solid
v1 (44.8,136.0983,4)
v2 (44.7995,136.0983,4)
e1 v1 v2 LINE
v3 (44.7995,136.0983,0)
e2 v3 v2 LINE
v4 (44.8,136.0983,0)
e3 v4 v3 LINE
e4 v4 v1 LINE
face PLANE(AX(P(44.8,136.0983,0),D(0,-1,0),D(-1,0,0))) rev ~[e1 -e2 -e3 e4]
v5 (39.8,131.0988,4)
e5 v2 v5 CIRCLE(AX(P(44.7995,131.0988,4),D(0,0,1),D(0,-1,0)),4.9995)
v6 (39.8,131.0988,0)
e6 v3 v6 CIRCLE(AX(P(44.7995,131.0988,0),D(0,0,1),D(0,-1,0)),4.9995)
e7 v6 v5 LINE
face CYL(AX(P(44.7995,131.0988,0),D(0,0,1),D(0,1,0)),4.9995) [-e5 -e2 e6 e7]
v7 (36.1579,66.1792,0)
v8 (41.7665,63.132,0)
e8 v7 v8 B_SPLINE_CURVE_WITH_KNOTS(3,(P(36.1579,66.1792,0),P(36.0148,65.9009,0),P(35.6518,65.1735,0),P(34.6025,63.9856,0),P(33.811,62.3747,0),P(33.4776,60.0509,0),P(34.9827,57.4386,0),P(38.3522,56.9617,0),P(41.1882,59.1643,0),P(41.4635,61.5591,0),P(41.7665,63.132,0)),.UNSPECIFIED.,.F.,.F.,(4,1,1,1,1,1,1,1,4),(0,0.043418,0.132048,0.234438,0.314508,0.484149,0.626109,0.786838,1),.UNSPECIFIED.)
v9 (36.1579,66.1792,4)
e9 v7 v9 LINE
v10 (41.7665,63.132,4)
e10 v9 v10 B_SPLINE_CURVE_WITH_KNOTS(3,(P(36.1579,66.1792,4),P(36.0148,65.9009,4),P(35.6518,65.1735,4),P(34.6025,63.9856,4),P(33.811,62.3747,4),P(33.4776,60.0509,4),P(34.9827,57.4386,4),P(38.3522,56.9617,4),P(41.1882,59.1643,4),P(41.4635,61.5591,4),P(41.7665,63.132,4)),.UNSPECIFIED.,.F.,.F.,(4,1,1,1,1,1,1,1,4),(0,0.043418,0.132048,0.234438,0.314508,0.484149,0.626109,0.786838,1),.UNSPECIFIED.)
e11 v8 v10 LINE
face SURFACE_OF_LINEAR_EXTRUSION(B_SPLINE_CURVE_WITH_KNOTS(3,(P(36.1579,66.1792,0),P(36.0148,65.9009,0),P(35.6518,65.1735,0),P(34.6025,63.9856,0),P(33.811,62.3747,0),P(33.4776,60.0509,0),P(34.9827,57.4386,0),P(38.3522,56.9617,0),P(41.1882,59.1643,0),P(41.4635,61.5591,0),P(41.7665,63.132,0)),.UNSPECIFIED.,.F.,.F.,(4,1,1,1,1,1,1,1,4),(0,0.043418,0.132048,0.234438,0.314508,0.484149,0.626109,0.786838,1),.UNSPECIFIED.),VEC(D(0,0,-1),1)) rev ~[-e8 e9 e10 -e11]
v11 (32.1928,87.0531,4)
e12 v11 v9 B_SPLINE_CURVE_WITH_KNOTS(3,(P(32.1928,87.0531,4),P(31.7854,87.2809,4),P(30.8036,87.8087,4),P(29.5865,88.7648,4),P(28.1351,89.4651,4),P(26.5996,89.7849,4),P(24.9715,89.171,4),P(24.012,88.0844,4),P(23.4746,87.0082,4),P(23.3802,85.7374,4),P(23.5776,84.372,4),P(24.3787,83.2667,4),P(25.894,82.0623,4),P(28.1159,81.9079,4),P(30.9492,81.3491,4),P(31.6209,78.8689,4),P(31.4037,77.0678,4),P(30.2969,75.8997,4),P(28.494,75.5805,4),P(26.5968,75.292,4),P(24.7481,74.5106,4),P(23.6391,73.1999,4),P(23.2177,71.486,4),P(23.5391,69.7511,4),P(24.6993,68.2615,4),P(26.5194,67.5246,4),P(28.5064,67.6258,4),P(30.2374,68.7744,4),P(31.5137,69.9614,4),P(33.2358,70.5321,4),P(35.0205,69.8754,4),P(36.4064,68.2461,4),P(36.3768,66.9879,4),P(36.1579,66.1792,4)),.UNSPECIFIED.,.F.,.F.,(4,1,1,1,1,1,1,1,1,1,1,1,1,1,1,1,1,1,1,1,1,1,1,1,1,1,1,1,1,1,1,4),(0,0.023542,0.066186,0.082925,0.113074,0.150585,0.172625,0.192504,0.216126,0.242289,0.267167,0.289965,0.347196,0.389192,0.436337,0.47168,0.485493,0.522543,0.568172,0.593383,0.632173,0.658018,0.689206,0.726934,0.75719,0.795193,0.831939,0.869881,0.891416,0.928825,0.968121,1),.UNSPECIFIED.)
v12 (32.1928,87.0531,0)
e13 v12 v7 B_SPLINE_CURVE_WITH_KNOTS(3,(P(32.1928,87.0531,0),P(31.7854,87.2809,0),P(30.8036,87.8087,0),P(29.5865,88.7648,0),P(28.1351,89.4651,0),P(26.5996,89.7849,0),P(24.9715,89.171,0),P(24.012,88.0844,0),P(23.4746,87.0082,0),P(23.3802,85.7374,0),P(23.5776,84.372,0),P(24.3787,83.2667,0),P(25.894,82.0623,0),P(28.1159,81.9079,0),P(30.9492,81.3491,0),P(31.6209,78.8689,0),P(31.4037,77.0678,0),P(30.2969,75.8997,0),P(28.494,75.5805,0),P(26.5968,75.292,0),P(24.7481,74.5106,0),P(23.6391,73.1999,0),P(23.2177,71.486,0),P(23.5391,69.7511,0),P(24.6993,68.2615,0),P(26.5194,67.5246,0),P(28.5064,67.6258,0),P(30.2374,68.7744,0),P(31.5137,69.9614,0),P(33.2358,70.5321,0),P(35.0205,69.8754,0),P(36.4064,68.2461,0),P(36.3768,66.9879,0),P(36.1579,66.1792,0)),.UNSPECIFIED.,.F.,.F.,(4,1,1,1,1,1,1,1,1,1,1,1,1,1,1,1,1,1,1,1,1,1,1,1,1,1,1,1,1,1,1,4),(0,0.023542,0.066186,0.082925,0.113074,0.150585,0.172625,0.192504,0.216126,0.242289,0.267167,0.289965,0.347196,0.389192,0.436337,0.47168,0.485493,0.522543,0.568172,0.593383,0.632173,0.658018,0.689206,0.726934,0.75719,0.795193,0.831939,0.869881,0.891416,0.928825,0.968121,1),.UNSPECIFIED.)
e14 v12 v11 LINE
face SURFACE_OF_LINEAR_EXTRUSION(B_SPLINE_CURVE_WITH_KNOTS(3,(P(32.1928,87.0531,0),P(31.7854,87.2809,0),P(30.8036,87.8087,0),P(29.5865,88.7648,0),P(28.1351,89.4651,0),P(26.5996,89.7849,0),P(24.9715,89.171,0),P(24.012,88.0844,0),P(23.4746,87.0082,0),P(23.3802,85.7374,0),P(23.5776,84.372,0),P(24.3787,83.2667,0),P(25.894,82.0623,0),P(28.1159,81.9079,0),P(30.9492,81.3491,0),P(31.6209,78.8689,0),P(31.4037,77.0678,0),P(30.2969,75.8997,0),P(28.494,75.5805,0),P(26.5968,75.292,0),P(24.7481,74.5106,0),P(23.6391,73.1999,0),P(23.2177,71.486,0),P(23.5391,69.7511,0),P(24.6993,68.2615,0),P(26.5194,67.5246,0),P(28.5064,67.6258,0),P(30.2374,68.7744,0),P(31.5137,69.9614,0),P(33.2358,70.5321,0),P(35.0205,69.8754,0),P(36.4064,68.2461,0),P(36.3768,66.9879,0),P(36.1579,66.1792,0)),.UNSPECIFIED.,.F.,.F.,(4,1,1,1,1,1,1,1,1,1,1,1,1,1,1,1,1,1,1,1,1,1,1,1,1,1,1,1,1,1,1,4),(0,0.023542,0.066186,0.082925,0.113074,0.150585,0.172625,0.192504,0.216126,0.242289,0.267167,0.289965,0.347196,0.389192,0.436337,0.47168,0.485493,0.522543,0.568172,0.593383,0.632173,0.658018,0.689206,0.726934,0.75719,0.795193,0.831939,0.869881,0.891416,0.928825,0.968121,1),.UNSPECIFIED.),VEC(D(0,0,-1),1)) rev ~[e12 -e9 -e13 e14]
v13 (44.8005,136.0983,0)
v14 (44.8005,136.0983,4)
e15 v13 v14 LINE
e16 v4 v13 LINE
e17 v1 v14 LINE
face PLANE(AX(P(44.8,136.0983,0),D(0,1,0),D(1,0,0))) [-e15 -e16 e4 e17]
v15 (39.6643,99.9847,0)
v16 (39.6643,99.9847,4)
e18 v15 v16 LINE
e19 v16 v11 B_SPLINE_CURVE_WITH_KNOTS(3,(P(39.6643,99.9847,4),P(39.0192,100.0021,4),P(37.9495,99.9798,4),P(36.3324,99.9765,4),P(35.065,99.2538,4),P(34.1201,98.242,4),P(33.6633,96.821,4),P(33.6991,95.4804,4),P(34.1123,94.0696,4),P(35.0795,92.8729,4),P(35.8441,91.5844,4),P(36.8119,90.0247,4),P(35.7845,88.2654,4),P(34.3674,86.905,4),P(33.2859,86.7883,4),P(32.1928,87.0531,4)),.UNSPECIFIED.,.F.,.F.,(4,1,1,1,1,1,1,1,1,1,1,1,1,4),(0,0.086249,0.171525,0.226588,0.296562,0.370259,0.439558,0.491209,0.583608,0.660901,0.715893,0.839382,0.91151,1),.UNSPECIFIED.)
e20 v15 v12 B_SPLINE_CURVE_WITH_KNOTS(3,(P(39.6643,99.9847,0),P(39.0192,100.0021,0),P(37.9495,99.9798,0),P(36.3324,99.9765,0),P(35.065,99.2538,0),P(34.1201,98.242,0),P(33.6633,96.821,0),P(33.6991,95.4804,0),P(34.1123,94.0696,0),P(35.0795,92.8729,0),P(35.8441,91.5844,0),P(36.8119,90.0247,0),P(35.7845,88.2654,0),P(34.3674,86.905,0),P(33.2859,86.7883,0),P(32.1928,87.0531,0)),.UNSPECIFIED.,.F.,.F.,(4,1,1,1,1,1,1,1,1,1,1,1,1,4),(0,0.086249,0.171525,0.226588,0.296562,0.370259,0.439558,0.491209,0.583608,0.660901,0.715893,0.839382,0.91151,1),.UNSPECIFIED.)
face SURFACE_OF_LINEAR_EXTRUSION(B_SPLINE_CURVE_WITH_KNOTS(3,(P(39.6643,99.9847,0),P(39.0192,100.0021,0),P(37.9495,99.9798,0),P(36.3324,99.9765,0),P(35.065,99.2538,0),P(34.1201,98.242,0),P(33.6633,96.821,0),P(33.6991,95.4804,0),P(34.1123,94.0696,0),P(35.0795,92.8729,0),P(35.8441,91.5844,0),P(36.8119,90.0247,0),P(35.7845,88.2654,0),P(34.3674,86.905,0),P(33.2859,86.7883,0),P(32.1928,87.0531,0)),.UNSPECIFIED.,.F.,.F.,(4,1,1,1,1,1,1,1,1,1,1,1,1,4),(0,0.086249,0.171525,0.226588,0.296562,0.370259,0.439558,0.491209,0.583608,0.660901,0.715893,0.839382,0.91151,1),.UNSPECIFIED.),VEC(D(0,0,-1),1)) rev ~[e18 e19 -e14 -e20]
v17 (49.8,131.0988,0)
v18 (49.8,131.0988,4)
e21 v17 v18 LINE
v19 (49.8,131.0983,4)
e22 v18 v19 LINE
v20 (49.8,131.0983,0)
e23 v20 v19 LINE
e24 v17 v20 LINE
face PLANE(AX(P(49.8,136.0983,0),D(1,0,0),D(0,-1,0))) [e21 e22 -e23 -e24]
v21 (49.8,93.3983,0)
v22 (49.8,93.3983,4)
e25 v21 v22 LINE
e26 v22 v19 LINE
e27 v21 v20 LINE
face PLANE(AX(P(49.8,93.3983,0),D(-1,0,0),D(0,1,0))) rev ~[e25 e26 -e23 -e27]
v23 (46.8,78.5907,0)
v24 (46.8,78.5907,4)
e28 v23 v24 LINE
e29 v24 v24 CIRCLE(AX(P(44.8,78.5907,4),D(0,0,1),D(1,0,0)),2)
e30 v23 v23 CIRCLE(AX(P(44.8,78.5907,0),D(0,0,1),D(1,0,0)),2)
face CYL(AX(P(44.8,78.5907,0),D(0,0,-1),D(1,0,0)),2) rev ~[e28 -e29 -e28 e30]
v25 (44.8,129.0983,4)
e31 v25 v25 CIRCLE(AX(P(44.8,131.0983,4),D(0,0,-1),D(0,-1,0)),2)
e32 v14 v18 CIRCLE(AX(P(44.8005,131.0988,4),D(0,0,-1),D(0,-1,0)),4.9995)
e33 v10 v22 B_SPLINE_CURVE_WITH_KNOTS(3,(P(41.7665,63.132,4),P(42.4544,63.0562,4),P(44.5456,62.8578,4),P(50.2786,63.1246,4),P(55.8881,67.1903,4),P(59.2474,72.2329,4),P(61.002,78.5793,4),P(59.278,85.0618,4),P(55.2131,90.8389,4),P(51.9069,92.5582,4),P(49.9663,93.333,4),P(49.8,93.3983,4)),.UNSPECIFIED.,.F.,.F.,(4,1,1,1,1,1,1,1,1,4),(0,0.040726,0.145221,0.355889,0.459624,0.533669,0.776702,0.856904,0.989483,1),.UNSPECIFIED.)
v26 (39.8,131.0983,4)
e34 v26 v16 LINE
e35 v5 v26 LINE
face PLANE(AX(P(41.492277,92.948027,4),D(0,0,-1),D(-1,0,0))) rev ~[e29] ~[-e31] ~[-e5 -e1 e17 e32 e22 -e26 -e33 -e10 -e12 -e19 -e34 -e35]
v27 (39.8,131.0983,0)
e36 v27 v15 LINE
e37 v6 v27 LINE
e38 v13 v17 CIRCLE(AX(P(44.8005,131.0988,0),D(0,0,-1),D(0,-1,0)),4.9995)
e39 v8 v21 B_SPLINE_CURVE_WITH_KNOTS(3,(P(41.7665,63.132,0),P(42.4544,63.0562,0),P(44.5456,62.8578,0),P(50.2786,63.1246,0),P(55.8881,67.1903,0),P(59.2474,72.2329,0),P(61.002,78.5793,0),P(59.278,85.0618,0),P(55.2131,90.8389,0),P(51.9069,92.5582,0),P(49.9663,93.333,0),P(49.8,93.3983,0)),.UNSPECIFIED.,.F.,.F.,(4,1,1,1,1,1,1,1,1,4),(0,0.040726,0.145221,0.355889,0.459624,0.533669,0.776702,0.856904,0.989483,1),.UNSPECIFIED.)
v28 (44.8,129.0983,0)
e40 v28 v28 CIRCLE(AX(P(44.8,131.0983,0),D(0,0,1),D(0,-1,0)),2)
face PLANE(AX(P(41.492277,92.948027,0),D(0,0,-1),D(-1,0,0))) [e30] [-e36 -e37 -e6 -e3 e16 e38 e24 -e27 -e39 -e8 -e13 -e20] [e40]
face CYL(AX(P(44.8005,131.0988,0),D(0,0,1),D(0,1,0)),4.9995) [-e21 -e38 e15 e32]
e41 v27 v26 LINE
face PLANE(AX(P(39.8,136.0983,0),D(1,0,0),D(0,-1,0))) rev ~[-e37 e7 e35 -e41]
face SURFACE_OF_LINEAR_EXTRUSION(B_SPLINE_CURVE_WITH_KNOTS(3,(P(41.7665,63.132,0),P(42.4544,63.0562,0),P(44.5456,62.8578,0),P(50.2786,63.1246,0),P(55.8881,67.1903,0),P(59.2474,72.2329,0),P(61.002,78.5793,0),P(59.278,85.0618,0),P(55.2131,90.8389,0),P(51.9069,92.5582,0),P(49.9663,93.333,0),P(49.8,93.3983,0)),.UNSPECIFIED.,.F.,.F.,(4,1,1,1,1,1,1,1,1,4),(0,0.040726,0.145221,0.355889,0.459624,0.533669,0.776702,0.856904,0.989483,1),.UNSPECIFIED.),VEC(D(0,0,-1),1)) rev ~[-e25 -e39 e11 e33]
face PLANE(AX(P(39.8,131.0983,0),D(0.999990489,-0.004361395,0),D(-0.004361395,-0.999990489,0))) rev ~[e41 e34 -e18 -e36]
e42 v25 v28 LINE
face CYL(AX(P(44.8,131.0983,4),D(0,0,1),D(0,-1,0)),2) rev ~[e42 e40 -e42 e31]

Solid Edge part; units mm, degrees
sketch "Sketch1" plane through (0, 0, 0) normal (0, 0, 1) x (1, 0, 0)
  line L0 (44.8, 136.0983) -> (49.8, 136.0983)
  line L1 (49.8, 136.0983) -> (49.8, 131.0983)
  line L2 (49.8, 93.3983) -> (49.8, 131.0983)
  spline S0 degree 3 poles (41.7665, 63.132) (42.4544, 63.0562) (44.5456, 62.8578) (50.2786, 63.1246) (55.8881, 67.1903) (59.2474, 72.2329) (61.002, 78.5793) (59.278, 85.0618) (55.2131, 90.8389) (51.9069, 92.5582) (49.9663, 93.333) (49.8, 93.3983) knots 0 0 0 0 0.040726 0.145221 0.355889 0.459624 0.533669 0.776702 0.856904 0.989483 1 1 1 1
  spline S1 degree 3 poles (36.1579, 66.1792) (36.0148, 65.9009) (35.6518, 65.1735) (34.6025, 63.9856) (33.811, 62.3747) (33.4776, 60.0509) (34.9827, 57.4386) (38.3522, 56.9617) (41.1882, 59.1643) (41.4635, 61.5591) (41.7665, 63.132) knots 0 0 0 0 0.043418 0.132048 0.234438 0.314508 0.484149 0.626109 0.786838 1 1 1 1
  spline S2 degree 3 poles (32.1928, 87.0531) (31.7854, 87.2809) (30.8036, 87.8087) (29.5865, 88.7648) (28.1351, 89.4651) (26.5996, 89.7849) (24.9715, 89.171) (24.012, 88.0844) (23.4746, 87.0082) (23.3802, 85.7374) (23.5776, 84.372) (24.3787, 83.2667) (25.894, 82.0623) (28.1159, 81.9079) (30.9492, 81.3491) (31.6209, 78.8689) (31.4037, 77.0678) (30.2969, 75.8997) (28.494, 75.5805) (26.5968, 75.292) (24.7481, 74.5106) (23.6391, 73.1999) (23.2177, 71.486) (23.5391, 69.7511) (24.6993, 68.2615) (26.5194, 67.5246) (28.5064, 67.6258) (30.2374, 68.7744) (31.5137, 69.9614) (33.2358, 70.5321) (35.0205, 69.8754) (36.4064, 68.2461) (36.3768, 66.9879) (36.1579, 66.1792) knots 0 0 0 0 0.023542 0.066186 0.082925 0.113074 0.150585 0.172625 0.192504 0.216126 0.242289 0.267167 0.289965 0.347196 0.389192 0.436337 0.47168 0.485493 0.522543 0.568172 0.593383 0.632173 0.658018 0.689206 0.726934 0.75719 0.795193 0.831939 0.869881 0.891416 0.928825 0.968121 1 1 1 1
  spline S3 degree 3 poles (39.6643, 99.9847) (39.0192, 100.0021) (37.9495, 99.9798) (36.3324, 99.9765) (35.065, 99.2538) (34.1201, 98.242) (33.6633, 96.821) (33.6991, 95.4804) (34.1123, 94.0696) (35.0795, 92.8729) (35.8441, 91.5844) (36.8119, 90.0247) (35.7845, 88.2654) (34.3674, 86.905) (33.2859, 86.7883) (32.1928, 87.0531) knots 0 0 0 0 0.086249 0.171525 0.226588 0.296562 0.370259 0.439558 0.491209 0.583608 0.660901 0.715893 0.839382 0.91151 1 1 1 1
  line L3 (39.8, 131.0983) -> (39.6643, 99.9847)
  line L4 (39.8, 136.0983) -> (39.8, 131.0983)
  line L5 (44.8, 136.0983) -> (39.8, 136.0983)
  circle A0 centre (44.8, 78.5907) radius 2
extrude "Protrusion1" add sketch "Sketch1" along normal blind 4
hole "Furo_1" at (44.8, 131.0983, 4) direction (0, 0, -1) diameter 4 end up to next
fillet "Redondo_1" radius 5 2 edges at (49.8, 136.0983, 2) (39.8, 136.0983, 2)
